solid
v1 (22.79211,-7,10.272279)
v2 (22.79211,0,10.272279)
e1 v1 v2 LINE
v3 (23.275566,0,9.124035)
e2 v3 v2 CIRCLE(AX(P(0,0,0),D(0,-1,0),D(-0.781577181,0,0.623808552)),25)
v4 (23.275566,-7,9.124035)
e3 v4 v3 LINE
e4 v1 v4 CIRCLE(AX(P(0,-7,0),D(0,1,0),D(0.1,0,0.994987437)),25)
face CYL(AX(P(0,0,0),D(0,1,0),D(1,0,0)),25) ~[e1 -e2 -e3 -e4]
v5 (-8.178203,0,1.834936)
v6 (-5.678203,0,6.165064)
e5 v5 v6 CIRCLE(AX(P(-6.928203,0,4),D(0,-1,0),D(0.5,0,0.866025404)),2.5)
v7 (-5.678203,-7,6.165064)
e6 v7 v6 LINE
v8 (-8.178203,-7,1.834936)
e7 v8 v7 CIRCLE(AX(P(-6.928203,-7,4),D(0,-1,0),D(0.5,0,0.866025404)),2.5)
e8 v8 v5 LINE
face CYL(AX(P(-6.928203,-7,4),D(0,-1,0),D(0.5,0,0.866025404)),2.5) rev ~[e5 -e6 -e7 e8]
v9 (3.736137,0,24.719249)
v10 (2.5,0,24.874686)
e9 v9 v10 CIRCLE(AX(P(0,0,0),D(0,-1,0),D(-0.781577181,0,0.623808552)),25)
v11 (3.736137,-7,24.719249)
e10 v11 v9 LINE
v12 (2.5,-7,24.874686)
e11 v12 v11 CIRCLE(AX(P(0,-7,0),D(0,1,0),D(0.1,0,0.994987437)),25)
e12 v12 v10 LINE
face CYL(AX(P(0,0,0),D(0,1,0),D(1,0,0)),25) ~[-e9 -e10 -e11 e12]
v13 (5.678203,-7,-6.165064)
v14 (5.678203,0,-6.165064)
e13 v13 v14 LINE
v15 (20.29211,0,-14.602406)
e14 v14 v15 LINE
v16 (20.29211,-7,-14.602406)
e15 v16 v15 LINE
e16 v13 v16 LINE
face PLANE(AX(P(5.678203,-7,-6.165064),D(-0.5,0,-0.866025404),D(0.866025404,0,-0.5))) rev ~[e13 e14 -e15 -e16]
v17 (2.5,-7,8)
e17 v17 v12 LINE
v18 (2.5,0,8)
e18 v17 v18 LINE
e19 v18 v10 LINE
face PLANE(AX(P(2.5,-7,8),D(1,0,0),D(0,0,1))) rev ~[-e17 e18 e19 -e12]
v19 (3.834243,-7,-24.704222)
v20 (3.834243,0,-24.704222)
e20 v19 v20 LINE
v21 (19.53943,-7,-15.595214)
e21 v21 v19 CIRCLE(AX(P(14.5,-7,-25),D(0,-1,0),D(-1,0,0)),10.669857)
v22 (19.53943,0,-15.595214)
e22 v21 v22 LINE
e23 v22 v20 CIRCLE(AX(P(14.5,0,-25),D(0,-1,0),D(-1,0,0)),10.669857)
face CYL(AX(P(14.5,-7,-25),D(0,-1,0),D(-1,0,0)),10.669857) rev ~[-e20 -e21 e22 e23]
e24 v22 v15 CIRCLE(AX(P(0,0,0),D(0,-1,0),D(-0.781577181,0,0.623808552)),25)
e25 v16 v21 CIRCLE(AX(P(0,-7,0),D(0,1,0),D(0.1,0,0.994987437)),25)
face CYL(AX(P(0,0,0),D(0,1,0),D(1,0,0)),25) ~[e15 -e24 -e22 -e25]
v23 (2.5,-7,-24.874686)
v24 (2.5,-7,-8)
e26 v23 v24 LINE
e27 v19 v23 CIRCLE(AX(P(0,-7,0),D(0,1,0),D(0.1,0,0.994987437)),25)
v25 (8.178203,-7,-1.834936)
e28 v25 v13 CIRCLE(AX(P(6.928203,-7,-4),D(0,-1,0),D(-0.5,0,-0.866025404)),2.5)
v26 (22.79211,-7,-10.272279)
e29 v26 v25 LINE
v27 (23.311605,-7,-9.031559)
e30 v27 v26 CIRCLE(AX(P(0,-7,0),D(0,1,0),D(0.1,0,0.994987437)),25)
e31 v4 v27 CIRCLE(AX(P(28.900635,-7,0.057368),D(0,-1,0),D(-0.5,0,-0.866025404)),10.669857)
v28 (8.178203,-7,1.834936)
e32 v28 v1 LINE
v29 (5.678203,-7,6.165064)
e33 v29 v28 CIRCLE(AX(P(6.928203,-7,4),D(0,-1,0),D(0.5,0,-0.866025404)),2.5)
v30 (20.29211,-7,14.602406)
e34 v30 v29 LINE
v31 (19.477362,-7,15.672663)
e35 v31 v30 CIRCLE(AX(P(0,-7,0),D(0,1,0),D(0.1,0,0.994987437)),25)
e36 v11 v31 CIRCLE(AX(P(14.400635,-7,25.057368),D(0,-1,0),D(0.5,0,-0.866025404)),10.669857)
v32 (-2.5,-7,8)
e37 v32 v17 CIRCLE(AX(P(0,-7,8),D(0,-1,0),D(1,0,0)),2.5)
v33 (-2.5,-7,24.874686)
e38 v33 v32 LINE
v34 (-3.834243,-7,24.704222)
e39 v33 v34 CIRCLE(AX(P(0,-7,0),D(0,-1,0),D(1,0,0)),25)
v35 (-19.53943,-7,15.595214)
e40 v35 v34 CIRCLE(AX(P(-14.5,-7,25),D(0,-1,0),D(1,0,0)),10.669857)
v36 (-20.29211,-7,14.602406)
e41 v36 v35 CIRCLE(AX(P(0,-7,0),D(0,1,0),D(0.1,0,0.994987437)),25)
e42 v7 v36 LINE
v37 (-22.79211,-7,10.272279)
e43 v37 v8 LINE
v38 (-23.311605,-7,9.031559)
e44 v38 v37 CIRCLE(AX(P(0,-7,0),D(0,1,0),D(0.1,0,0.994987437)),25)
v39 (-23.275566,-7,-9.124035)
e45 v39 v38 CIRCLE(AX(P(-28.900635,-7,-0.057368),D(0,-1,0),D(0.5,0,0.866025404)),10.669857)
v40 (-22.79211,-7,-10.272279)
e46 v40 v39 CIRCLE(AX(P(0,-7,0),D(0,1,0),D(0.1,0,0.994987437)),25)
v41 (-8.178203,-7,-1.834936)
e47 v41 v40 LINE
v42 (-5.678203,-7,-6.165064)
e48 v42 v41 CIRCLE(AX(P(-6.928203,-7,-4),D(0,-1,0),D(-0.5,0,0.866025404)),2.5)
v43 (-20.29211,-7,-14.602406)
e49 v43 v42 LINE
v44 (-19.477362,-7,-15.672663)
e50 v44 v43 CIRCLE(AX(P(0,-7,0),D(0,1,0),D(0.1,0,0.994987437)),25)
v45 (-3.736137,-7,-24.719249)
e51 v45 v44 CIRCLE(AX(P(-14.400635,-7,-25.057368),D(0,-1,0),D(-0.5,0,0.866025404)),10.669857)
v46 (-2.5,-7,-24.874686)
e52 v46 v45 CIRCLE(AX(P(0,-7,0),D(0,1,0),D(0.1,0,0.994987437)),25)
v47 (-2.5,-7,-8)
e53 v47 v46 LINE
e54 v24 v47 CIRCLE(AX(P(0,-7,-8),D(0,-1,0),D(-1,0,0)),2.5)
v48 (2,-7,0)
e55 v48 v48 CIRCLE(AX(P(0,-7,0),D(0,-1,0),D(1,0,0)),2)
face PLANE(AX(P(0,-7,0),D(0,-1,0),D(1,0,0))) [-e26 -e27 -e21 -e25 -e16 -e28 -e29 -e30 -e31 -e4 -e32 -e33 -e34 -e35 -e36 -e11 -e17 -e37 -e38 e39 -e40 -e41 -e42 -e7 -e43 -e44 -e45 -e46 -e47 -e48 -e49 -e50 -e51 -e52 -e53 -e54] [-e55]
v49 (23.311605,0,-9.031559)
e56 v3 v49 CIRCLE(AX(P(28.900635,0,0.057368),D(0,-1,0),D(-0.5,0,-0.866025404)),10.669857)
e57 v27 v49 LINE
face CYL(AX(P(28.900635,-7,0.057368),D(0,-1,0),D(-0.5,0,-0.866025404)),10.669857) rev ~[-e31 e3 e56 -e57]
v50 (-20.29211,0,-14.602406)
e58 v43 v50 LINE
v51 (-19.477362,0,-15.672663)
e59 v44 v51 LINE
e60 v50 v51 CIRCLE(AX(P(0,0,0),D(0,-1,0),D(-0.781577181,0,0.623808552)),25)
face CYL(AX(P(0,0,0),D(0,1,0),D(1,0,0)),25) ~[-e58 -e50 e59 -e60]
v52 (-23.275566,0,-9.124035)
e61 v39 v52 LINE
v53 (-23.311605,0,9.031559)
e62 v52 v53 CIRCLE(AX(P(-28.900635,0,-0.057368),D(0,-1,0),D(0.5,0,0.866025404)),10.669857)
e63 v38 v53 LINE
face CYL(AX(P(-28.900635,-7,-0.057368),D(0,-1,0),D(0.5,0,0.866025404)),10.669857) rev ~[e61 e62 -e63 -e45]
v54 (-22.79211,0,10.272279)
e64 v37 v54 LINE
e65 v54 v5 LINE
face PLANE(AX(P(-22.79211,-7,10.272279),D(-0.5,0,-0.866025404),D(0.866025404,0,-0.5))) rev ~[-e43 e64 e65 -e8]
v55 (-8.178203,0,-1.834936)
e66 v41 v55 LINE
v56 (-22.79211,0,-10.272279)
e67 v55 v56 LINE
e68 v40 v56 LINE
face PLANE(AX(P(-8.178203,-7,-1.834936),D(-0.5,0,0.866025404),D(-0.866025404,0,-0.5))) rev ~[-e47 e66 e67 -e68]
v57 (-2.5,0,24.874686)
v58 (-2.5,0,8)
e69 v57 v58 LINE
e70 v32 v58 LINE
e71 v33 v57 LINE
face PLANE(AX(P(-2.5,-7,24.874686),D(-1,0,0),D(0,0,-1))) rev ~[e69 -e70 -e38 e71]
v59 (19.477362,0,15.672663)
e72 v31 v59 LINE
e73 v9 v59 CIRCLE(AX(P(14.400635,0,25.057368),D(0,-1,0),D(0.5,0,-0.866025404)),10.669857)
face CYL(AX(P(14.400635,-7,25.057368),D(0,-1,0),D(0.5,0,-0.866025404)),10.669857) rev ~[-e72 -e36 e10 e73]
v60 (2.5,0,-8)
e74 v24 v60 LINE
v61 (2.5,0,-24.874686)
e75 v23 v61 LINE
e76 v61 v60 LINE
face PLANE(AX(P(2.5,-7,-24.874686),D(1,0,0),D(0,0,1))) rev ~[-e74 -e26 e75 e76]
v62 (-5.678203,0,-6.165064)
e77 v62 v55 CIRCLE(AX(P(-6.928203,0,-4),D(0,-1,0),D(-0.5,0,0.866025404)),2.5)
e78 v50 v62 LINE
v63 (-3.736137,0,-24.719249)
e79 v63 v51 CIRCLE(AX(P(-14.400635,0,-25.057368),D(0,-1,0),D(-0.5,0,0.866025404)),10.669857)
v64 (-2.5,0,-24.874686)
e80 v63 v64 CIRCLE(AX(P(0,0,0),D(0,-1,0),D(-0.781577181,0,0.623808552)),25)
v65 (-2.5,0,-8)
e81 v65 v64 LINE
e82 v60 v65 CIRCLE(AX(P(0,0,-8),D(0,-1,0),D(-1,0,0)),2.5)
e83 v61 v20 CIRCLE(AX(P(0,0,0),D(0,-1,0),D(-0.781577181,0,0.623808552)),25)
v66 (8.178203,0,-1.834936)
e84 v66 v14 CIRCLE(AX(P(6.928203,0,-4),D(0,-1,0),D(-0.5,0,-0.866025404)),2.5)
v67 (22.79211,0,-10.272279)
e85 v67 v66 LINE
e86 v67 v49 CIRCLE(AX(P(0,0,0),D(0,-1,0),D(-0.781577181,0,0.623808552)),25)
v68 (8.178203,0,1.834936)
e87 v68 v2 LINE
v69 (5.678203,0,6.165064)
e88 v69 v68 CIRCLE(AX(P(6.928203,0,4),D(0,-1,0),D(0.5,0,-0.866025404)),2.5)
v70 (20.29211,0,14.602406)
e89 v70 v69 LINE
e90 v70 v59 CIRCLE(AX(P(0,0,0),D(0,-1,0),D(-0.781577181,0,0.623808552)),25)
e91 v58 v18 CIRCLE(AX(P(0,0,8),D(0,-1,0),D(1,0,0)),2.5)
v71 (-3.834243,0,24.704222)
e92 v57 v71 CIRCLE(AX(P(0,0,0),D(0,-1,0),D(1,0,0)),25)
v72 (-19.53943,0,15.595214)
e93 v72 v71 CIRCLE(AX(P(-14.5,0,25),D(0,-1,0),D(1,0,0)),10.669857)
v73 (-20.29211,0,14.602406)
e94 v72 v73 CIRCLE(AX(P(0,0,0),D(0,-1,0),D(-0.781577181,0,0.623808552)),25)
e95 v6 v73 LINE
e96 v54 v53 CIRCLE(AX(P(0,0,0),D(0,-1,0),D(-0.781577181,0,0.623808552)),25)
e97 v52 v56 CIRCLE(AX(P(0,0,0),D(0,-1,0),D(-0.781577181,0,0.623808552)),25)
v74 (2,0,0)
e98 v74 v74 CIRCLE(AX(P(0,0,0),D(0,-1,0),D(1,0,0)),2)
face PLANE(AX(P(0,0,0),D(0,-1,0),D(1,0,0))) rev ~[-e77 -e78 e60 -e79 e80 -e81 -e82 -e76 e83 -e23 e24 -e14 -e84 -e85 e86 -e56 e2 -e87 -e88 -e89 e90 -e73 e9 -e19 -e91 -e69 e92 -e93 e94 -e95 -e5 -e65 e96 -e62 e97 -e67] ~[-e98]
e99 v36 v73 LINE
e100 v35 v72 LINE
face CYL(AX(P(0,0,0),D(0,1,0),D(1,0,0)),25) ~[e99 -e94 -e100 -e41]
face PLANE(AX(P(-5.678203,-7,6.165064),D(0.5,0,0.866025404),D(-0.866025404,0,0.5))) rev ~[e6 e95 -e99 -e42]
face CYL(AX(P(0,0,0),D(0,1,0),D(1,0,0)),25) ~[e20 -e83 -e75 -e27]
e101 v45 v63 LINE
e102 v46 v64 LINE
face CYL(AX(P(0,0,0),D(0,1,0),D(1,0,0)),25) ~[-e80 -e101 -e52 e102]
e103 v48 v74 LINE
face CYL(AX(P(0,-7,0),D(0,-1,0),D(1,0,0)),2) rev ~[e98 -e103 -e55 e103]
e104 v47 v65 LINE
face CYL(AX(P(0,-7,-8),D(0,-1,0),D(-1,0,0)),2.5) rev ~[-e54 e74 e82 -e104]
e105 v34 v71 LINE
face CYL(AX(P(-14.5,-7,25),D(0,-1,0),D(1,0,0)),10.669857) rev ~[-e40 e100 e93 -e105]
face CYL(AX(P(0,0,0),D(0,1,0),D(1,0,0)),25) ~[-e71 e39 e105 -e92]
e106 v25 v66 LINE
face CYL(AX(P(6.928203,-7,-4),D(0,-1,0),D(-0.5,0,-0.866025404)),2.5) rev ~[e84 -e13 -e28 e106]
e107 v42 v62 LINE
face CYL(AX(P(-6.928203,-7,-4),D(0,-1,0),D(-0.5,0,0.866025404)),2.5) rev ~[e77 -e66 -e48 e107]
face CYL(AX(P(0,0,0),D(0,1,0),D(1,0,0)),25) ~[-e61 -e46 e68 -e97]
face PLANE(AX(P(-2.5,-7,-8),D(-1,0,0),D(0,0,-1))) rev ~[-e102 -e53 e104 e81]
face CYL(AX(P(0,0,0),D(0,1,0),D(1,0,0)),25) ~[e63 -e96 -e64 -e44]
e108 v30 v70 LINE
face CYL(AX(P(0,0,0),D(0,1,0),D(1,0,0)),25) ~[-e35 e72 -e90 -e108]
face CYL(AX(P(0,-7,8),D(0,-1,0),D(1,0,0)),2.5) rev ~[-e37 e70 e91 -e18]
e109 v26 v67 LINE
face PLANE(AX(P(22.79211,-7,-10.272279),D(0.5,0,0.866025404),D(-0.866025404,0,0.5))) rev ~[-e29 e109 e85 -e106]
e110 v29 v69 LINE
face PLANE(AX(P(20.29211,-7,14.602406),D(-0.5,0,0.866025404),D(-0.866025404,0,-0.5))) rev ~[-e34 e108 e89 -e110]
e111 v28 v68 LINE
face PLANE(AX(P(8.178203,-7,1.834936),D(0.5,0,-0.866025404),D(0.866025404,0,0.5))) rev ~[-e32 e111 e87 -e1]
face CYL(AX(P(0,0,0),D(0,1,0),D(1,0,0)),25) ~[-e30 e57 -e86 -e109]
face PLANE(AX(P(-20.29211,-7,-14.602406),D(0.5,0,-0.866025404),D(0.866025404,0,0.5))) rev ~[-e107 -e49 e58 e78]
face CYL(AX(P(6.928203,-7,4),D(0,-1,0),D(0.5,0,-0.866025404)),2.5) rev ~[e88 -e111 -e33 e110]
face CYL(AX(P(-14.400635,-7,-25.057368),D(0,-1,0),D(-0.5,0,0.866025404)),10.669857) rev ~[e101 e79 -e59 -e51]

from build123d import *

# Parameters (mm, degrees)
F0_R            = 25
F1_DEPTH        = 7
F3_DEPTH        = 13.3
F3_COPIES_COUNT = 6
F4_R            = 2
F5_DEPTH        = 25


# Not quite as in the source:
# - a pattern or mirror of a feature is missing from the dataset's text; its kind, count and spacing are read off the source's solid


with BuildPart() as f1:
    # F0 (on Front) → F1 (new body)
    with BuildSketch(Plane.XZ):
        Circle(F0_R)
    extrude(amount=F1_DEPTH)

    # F2 (on face) → F3 (cut)
    with BuildSketch(Plane.XZ.offset(7)):
        with BuildLine():
            ThreePointArc((-19.5394295308, 15.5952138046), (-12.5429522443, 21.6257797315), (-3.8342431732, 24.704221892))
            ThreePointArc((-3.8342431732, 24.704221892), (-3.8311679177, 24.8520967356), (-3.8301427668, 25))
            ThreePointArc((-3.8301427668, 25), (-19.9806869892, 34.1546667609), (-19.5394295308, 15.5952138046))
        make_face()
        with BuildLine():
            ThreePointArc((-19.5394295308, 15.5952138046), (-9.1467396108, 15.7702407083), (-3.8342431732, 24.704221892))
            ThreePointArc((-3.8342431732, 24.704221892), (-12.5429522443, 21.6257797315), (-19.5394295308, 15.5952138046))
        make_face()
        with BuildLine():
            ThreePointArc((2.4968730444, 24.875), (2.4992181388, 24.9374804474), (2.5, 25))
            ThreePointArc((2.5, 25), (0, 27.5), (-2.5, 25))
            ThreePointArc((-2.5, 25), (-2.4992181388, 24.9374804474), (-2.4968730444, 24.875))
            ThreePointArc((-2.4968730444, 24.875), (0, 25), (2.4968730444, 24.875))
        make_face()
        with BuildLine():
            ThreePointArc((-2.4968730444, 24.875), (0, 22.5), (2.4968730444, 24.875))
            ThreePointArc((2.4968730444, 24.875), (0, 25), (-2.4968730444, 24.875))
        make_face()
        with BuildLine():
            ThreePointArc((2.5, 24.8746859277), (2.4984365271, 24.874843013), (2.4968730444, 24.875))
            ThreePointArc((2.4968730444, 24.875), (0, 22.5), (-2.4968730444, 24.875))
            ThreePointArc((-2.4968730444, 24.875), (-2.4984365271, 24.874843013), (-2.5, 24.8746859277))
            Line((-2.5, 24.8746859277), (-2.5, 8))
            ThreePointArc((-2.5, 8), (0, 10.5), (2.5, 8))
            Line((2.5, 8), (2.5, 24.8746859277))
        make_face()
        with BuildLine():
            ThreePointArc((-2.5, 8), (0, 5.5), (2.5, 8))
            ThreePointArc((2.5, 8), (0, 10.5), (-2.5, 8))
        make_face()
    f3 = extrude(amount=-F3_DEPTH, mode=Mode.SUBTRACT)

    # F3_copies: F3 ×6 about axis
    f3_copies_axis = Axis((0, 0, 0), (0, 1, 0))
    for i in range(1, F3_COPIES_COUNT):
        add(f3.rotate(f3_copies_axis, i * 360 / F3_COPIES_COUNT), mode=Mode.SUBTRACT)

    # F4 (on face) → F5 (cut)
    with BuildSketch(Plane.XZ.offset(7)):
        Circle(F4_R)
    extrude(amount=-F5_DEPTH, mode=Mode.SUBTRACT)


solid = f1.part
